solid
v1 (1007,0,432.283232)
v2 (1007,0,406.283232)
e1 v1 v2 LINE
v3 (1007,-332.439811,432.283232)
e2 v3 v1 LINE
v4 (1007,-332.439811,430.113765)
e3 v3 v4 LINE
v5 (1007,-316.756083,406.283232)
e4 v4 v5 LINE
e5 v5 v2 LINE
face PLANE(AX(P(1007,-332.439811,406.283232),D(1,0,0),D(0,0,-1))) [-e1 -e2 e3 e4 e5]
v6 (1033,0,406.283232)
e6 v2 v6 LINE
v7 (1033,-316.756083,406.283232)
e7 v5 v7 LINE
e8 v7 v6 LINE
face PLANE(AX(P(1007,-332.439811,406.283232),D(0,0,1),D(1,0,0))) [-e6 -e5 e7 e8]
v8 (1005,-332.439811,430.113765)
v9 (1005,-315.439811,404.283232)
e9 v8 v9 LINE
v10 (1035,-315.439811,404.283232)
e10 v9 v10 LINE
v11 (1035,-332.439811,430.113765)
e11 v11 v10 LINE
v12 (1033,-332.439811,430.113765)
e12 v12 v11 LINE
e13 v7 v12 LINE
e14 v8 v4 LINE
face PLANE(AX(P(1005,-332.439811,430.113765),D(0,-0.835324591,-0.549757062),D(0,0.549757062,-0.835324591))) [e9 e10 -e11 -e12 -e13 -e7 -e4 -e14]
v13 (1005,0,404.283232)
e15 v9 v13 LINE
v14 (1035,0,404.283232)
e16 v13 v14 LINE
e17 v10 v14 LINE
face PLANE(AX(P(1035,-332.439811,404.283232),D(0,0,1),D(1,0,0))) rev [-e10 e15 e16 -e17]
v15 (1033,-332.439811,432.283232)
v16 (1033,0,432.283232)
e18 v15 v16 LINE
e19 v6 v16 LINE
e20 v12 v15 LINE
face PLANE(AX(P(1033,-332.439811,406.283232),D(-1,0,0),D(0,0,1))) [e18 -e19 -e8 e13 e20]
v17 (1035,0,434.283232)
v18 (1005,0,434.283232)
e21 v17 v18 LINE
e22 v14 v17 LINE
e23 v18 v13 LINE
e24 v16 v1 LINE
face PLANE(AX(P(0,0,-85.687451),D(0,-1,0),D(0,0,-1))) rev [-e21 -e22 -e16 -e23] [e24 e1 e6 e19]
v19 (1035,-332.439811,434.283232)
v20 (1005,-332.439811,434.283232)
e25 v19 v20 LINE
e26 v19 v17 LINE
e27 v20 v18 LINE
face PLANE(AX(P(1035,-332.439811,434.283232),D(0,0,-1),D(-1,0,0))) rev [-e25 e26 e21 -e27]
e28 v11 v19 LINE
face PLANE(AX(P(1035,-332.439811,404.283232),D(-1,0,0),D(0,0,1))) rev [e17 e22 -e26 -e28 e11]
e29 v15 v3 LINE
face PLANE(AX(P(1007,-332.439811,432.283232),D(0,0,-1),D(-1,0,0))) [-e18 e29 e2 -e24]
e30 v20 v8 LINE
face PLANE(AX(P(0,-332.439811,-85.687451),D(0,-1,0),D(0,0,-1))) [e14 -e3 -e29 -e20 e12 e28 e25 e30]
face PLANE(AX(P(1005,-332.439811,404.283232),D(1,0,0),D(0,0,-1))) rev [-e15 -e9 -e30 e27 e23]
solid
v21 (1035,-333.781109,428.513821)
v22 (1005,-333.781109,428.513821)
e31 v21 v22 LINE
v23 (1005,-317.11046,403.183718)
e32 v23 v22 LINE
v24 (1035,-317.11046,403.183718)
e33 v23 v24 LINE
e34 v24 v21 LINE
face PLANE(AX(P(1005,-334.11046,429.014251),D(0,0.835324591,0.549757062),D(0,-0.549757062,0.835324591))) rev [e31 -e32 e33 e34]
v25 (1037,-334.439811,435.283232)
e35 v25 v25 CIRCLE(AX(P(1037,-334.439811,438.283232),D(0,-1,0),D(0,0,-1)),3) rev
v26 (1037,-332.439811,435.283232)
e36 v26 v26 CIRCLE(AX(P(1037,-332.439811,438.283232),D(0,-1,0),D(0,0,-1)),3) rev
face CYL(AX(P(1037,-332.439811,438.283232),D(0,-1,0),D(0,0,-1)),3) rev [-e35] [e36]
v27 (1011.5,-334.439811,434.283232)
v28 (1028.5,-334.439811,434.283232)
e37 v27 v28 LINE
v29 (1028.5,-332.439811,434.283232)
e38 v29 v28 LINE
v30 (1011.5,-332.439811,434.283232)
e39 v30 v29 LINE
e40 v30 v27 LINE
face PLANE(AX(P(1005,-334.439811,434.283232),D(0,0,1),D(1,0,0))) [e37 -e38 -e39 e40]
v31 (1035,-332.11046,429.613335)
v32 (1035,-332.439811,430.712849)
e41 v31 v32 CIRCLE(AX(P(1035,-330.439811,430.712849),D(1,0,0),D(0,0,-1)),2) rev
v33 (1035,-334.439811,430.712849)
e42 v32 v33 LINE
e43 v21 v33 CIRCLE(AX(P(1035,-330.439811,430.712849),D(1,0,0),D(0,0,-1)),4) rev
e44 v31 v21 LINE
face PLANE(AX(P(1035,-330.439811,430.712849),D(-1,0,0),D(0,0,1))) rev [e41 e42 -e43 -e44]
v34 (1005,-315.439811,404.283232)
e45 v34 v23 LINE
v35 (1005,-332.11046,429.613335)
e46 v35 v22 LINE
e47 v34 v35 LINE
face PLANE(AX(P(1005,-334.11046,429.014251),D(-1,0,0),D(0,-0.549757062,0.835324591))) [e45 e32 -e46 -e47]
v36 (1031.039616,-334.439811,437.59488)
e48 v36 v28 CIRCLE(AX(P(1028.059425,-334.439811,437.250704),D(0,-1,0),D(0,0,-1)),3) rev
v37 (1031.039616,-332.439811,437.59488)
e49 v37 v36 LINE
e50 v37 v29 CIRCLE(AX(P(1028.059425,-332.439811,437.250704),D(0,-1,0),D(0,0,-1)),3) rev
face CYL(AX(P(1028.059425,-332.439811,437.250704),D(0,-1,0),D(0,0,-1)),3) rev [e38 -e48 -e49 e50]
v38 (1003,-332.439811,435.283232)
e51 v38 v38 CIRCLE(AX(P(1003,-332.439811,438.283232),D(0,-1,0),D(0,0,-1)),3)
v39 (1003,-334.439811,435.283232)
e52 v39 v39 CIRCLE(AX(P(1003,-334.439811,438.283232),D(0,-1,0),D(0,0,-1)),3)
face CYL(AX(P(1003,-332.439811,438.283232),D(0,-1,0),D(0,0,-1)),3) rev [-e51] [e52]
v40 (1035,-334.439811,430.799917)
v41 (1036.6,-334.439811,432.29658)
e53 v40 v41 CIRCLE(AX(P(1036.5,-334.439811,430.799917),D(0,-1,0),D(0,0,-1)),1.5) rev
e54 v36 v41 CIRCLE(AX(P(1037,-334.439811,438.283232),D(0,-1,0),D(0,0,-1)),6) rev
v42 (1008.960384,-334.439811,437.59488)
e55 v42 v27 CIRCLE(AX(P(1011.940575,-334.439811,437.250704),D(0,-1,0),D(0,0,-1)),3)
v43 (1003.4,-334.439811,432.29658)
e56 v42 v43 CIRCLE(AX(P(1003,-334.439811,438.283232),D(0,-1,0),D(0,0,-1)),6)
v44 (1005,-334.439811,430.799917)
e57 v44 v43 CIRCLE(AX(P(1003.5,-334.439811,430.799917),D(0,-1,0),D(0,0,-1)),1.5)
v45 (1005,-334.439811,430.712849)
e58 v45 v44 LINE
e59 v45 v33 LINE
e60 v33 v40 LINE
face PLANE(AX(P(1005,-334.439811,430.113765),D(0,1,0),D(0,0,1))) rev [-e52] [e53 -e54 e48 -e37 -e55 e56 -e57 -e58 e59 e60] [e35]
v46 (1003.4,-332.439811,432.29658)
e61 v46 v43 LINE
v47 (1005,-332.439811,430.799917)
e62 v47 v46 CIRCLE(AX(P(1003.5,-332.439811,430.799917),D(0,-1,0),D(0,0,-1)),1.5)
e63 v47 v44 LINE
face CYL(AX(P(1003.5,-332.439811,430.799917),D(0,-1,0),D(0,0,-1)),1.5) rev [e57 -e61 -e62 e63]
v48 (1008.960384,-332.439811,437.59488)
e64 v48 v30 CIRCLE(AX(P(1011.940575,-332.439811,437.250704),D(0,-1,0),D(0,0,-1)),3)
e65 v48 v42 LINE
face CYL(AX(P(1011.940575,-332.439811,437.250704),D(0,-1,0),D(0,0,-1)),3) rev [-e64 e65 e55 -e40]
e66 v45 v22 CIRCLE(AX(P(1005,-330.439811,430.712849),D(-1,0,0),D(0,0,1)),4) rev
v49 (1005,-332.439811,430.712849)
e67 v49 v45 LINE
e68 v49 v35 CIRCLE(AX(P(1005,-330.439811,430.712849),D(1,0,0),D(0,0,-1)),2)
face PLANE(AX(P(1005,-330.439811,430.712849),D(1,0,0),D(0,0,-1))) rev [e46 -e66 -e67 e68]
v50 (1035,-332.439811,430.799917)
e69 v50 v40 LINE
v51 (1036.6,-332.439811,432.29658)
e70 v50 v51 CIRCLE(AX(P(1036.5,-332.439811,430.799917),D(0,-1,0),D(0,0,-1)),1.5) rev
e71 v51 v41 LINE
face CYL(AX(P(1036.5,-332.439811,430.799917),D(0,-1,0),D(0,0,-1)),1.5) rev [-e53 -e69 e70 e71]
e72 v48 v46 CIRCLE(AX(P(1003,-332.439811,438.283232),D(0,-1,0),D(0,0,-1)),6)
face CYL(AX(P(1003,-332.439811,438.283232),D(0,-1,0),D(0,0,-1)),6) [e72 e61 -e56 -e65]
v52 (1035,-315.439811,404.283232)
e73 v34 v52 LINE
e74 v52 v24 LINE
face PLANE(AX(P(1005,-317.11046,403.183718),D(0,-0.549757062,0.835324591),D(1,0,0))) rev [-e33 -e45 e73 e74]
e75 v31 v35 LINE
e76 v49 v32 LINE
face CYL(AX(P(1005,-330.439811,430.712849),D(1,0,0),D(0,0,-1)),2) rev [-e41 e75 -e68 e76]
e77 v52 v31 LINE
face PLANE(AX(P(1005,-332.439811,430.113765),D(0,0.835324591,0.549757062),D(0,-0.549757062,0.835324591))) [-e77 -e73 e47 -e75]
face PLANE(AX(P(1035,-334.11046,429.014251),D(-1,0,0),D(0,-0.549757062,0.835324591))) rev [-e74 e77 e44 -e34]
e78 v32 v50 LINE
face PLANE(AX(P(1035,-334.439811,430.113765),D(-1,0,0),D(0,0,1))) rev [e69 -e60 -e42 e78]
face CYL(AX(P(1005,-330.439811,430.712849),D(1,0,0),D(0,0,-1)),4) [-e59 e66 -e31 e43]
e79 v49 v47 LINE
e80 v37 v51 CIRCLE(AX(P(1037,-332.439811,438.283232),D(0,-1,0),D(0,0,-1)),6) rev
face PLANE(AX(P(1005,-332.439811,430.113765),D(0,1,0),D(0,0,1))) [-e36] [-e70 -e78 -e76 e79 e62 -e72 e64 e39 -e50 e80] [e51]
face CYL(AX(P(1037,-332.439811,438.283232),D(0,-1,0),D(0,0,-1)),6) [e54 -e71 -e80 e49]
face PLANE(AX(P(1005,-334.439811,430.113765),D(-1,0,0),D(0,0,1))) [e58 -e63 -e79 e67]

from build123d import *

# Parameters (mm, degrees)
SZKIC1_W                               = 30
SZKIC1_H                               = 30
SZKIC1_W_2                             = 26
SZKIC1_H_2                             = 26
PUTM_F_SQUARE_PROFILES_30X30X2_1_DEPTH = 332.439810961
WYTNIJ_WYCI_GNI_CIE2_DEPTH             = 548.739128832
WYCI_GNI_CIE_CIENKA_CIANKA1_DEPTH      = 30
KONWERTUJ_START                        = 1005
KONWERTUJ_BRY_1_DEPTH                  = 30
KONWERTUJ_BRY_1_2_DEPTH                = 30
SZKIC10_R                              = 3
DODANIE_WYCI_GNI_CIE3_DEPTH            = 2


# Read off the part's stored shape, not the designer's step: Konwertuj bryłę1
with BuildPart() as part:
    # Szkic1 → Putm-f-square-profiles 30X30X2(1) (new body)
    with BuildSketch(Plane(origin=(1020, 0, 419.283231707), x_dir=(1, 0, 0), z_dir=(0, -1, 0))):
        Rectangle(SZKIC1_W, SZKIC1_H)
        Rectangle(SZKIC1_W_2, SZKIC1_H_2, mode=Mode.SUBTRACT)
    extrude(amount=PUTM_F_SQUARE_PROFILES_30X30X2_1_DEPTH)

    # Szkic4 → Wytnij-wyciągnięcie2 (cut, through all)
    with BuildSketch(Plane(origin=(1035, 0, 0), x_dir=(0, 0, -1), z_dir=(1, 0, 0))):
        Polygon((-430.113764924, -332.439810961), (-404.283231707, -315.439810961), (-404.283231707, -332.439810961), align=None)
    extrude(amount=-WYTNIJ_WYCI_GNI_CIE2_DEPTH, mode=Mode.SUBTRACT)


with BuildPart() as body_2:
    # Szkic5 → Wyciągnięcie-cienka ścianka1 (new, through all)
    with BuildSketch(Plane(origin=(1035, 0, 0), x_dir=(0, 0, -1), z_dir=(1, 0, 0))):
        Polygon((-434.283231707, -332.439810961), (-430.113764924, -332.439810961), (-404.283231707, -315.439810961), (-403.183717583, -317.110460144), (-429.514680638, -334.439810961), (-434.283231707, -334.439810961), align=None)
    extrude(amount=-WYCI_GNI_CIE_CIENKA_CIANKA1_DEPTH)

    # Konwertuj bryłę1 outline → Konwertuj bryłę1 (cut)
    with BuildSketch(Plane.YZ.offset(KONWERTUJ_START)):
        with BuildLine():
            ThreePointArc((-333.781109326, 428.513820963), (-334.271598629, 429.56506732), (-334.439810961, 430.712849211))
            Line((-334.439810961, 430.712849211), (-334.439810961, 429.514680638))
            Line((-334.439810961, 429.514680638), (-333.781109326, 428.513820963))
        make_face()
    extrude(amount=KONWERTUJ_BRY_1_DEPTH, mode=Mode.SUBTRACT)

    # Konwertuj bry_1 2 outline → Konwertuj bry_1 2 (add)
    with BuildSketch(Plane.YZ.offset(KONWERTUJ_START)):
        with BuildLine():
            ThreePointArc((-332.110460144, 429.613335087), (-332.355704795, 430.138958265), (-332.439810961, 430.712849211))
            Line((-332.439810961, 430.712849211), (-332.439810961, 430.113764924))
            Line((-332.439810961, 430.113764924), (-332.110460144, 429.613335087))
        make_face()
    extrude(amount=KONWERTUJ_BRY_1_2_DEPTH)

    # Szkic10 → Dodanie-wyciągnięcie3 (add)
    # profile 1 of 2: a face of its own
    with BuildSketch(Plane.XZ.offset(334.439810961)):
        with BuildLine():
            ThreePointArc((1031.039616452, 437.59488008), (1030.440005619, 435.425099056), (1028.5, 434.283231707))
            Line((1028.5, 434.283231707), (1035, 434.283231707))
            Line((1035, 434.283231707), (1035, 430.799916934))
            ThreePointArc((1035, 430.799916934), (1035.475304923, 431.895362049), (1036.6, 432.296579888))
            ThreePointArc((1036.6, 432.296579888), (1041.13903563, 442.62700703), (1031.039616452, 437.59488008))
        make_face()
        with Locations(Location((1037, 438.283231707, 0), (0, 0, 270))):
            Circle(SZKIC10_R, mode=Mode.SUBTRACT)
    # profile 2 of 2: a face of its own
    with BuildSketch(Plane.XZ.offset(334.439810961)):
        with BuildLine():
            Line((1005, 430.799916934), (1005, 434.283231707))
            Line((1005, 434.283231707), (1011.5, 434.283231707))
            ThreePointArc((1011.5, 434.283231707), (1009.559994381, 435.425099056), (1008.960383548, 437.59488008))
            ThreePointArc((1008.960383548, 437.59488008), (998.86096437, 442.62700703), (1003.4, 432.296579888))
            ThreePointArc((1003.4, 432.296579888), (1004.524695077, 431.895362049), (1005, 430.799916934))
        make_face()
        with Locations(Location((1003, 438.283231707, 0), (0, 0, 270))):
            Circle(SZKIC10_R, mode=Mode.SUBTRACT)
    extrude(amount=-DODANIE_WYCI_GNI_CIE3_DEPTH)


solid = Compound([part.part, body_2.part])
